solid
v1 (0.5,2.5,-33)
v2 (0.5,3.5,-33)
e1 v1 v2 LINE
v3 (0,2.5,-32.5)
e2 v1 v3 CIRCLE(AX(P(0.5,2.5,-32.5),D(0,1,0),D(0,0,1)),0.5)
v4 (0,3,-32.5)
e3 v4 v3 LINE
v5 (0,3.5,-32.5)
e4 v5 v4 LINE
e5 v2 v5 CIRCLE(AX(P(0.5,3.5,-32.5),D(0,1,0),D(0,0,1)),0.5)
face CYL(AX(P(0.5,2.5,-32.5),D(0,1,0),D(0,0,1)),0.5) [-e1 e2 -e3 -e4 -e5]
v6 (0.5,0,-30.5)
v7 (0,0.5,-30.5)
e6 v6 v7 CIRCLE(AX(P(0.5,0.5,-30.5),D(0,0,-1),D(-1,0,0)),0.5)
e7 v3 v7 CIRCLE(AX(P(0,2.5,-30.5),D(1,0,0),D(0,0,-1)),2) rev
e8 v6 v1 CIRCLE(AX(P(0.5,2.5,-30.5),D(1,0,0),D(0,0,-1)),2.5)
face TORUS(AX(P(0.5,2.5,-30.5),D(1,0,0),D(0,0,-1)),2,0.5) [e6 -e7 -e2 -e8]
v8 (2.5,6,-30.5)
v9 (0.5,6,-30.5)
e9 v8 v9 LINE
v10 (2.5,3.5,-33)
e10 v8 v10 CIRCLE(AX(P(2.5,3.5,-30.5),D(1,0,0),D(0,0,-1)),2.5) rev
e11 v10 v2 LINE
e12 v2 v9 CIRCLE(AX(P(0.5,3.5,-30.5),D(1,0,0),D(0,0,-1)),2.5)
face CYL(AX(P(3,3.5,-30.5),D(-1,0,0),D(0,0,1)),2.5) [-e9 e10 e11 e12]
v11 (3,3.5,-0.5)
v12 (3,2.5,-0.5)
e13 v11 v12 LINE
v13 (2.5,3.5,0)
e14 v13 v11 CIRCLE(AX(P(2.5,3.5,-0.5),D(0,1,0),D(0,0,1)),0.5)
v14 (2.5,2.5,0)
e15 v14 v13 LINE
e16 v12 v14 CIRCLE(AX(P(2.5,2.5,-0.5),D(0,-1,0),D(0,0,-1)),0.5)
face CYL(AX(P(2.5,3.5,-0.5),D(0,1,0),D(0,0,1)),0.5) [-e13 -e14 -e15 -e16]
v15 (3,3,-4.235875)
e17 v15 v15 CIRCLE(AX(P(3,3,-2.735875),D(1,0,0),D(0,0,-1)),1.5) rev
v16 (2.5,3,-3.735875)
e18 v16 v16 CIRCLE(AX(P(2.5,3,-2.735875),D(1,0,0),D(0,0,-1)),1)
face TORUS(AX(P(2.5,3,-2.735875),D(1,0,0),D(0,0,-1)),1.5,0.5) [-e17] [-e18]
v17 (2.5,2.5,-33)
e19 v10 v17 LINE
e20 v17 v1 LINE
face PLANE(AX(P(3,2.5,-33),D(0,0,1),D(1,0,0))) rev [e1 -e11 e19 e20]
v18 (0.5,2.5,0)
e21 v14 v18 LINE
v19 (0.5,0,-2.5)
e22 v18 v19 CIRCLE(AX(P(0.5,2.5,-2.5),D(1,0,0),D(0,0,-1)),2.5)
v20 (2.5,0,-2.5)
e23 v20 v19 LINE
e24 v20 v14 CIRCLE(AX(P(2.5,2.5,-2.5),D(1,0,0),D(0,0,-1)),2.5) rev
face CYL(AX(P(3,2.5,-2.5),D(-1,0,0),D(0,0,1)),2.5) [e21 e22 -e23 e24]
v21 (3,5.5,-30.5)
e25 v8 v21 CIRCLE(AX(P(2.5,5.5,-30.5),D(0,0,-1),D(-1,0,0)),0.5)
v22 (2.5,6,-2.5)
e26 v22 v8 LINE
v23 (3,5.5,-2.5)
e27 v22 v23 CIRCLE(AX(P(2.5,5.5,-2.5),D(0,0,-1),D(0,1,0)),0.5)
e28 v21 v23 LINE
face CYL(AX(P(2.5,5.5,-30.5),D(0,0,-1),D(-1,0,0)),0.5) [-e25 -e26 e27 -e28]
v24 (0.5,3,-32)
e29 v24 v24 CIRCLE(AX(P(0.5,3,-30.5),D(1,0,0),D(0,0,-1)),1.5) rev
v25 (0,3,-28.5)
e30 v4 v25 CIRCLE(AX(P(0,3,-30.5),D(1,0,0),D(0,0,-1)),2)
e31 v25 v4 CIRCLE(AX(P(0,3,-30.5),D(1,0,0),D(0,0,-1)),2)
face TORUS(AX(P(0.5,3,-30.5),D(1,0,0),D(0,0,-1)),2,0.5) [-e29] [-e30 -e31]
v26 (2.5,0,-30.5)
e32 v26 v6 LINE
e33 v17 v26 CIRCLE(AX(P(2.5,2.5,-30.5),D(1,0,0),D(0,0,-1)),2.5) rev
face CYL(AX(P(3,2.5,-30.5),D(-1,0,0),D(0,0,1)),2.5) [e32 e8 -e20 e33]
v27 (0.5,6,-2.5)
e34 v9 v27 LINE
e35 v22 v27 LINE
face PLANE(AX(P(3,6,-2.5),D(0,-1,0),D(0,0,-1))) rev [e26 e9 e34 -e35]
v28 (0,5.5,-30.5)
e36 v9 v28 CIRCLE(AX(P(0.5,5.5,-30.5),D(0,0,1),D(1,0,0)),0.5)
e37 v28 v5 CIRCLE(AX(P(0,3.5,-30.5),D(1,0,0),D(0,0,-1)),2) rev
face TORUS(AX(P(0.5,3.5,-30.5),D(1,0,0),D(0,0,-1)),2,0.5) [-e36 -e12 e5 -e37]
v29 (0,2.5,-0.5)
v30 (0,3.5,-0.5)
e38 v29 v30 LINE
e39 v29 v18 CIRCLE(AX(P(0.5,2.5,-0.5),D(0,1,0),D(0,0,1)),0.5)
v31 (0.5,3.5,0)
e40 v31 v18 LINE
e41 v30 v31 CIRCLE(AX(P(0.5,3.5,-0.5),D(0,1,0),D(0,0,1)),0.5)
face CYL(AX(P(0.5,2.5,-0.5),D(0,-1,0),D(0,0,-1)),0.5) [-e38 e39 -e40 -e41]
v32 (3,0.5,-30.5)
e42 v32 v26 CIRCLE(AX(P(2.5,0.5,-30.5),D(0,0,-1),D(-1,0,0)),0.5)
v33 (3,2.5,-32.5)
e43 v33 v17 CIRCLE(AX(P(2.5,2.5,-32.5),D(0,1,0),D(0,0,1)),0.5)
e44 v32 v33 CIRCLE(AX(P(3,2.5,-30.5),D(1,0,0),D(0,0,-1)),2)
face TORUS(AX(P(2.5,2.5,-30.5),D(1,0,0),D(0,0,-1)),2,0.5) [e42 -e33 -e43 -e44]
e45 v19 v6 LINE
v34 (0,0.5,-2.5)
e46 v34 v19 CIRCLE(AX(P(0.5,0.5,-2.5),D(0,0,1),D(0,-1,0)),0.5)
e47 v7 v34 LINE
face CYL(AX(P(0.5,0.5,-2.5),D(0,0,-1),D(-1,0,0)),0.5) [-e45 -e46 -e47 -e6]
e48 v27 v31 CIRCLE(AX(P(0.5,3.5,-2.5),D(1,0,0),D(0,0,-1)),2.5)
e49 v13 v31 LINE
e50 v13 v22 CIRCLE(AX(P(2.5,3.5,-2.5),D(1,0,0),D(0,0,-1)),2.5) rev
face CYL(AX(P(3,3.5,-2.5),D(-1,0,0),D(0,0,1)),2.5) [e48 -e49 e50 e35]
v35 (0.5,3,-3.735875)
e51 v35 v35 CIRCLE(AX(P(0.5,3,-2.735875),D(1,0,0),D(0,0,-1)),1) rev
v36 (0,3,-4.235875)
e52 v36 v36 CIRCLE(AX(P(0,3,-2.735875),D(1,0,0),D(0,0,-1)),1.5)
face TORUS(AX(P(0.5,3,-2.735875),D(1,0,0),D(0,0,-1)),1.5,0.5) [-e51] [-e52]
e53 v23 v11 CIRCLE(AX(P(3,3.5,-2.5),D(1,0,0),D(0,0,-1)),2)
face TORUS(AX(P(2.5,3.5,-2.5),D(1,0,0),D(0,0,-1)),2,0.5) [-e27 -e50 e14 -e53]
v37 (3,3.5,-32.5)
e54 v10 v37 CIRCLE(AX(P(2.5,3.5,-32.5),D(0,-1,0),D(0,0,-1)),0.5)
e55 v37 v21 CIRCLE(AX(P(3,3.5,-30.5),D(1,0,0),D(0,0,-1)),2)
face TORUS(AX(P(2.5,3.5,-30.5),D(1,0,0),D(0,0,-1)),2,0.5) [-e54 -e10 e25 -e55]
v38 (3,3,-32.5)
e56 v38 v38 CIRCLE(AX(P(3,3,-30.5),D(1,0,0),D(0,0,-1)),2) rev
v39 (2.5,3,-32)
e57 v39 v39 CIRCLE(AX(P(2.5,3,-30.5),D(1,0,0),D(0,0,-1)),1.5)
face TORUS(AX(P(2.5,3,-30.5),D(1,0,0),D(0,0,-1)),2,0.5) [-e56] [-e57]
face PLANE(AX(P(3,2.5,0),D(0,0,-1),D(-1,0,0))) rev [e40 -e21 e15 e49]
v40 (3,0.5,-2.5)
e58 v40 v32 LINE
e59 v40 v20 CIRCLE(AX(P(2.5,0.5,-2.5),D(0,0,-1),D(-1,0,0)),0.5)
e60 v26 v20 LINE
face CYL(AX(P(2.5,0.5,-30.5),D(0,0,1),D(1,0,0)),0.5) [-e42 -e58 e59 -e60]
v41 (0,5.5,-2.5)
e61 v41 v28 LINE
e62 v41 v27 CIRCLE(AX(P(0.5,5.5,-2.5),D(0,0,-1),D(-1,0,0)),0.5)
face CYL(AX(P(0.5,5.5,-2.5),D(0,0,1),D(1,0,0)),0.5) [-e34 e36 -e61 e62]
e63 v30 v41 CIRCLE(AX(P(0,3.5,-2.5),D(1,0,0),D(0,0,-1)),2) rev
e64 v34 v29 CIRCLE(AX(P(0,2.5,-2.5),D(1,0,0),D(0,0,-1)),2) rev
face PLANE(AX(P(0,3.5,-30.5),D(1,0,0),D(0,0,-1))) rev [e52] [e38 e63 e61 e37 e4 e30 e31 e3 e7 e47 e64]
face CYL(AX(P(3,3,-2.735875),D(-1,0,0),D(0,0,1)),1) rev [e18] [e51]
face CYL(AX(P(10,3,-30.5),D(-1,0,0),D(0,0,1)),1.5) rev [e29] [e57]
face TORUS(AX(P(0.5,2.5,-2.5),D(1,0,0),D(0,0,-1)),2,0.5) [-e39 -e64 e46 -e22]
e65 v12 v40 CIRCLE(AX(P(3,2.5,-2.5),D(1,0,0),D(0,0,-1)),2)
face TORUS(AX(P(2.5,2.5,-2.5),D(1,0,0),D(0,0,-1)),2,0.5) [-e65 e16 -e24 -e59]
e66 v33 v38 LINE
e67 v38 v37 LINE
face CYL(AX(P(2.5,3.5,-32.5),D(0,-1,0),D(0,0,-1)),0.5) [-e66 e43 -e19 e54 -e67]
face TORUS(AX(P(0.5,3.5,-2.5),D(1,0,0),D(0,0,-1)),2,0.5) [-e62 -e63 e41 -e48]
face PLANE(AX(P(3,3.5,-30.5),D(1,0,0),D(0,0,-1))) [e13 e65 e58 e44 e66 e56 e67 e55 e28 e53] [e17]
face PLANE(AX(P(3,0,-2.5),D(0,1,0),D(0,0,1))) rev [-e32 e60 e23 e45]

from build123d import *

# Parameters (mm, degrees)
SKETCH1_R           = 1
BOSS_EXTRUDE1_DEPTH = 3
SKETCH2_R           = 1.5
CUT_EXTRUDE1_DEPTH  = 10
FILLET1_R           = 0.5


with BuildPart() as part:
    # Sketch1 → Boss-Extrude1 (new body)
    with BuildSketch(Plane(origin=(0, 0, 0), x_dir=(0, 0, -1), z_dir=(1, 0, 0))):
        with BuildLine():
            Line((2.5, 0), (30.5, 0))
            ThreePointArc((30.5, 0), (32.267766953, 0.732233047), (33, 2.5))
            Line((33, 2.5), (33, 3.5))
            ThreePointArc((33, 3.5), (32.267766953, 5.267766953), (30.5, 6))
            Line((30.5, 6), (2.5, 6))
            ThreePointArc((2.5, 6), (0.732233047, 5.267766953), (0, 3.5))
            Line((0, 3.5), (0, 2.5))
            ThreePointArc((0, 2.5), (0.732233047, 0.732233047), (2.5, 0))
        make_face()
        with Locations((2.73587532, 3)):
            Circle(SKETCH1_R, mode=Mode.SUBTRACT)
    extrude(amount=BOSS_EXTRUDE1_DEPTH)

    # Sketch2 → Cut-Extrude1 (cut)
    with BuildSketch(Plane.ZY):
        with Locations((-30.5, 3)):
            Circle(SKETCH2_R)
    extrude(amount=-CUT_EXTRUDE1_DEPTH, mode=Mode.SUBTRACT)

    # Fillet1
    fillet1_edges = [part.edges().sort_by_distance(p)[0] for p in [
        (3, 5.267766953, -0.732233047),
        (0, 6, -16.5),
        (0, 5.267766953, -32.267766953),
        (3, 3, 0),
        (3, 0.732233047, -0.732233047),
        (3, 0, -16.5),
        (0, 3, -1.73587532),
        (3, 3, -1.73587532),
        (3, 0.732233047, -32.267766953),
        (3, 3, -33),
        (3, 3, -32),
        (0, 3, -32),
        (3, 5.267766953, -32.267766953),
        (3, 6, -16.5),
        (0, 3, -33),
        (0, 0.732233047, -32.267766953),
        (0, 0, -16.5),
        (0, 0.732233047, -0.732233047),
        (0, 3, 0),
        (0, 5.267766953, -0.732233047),
    ]]
    fillet(fillet1_edges, radius=FILLET1_R - 0.0001)  # a hair under: the kernel refuses the full size


solid = part.part
